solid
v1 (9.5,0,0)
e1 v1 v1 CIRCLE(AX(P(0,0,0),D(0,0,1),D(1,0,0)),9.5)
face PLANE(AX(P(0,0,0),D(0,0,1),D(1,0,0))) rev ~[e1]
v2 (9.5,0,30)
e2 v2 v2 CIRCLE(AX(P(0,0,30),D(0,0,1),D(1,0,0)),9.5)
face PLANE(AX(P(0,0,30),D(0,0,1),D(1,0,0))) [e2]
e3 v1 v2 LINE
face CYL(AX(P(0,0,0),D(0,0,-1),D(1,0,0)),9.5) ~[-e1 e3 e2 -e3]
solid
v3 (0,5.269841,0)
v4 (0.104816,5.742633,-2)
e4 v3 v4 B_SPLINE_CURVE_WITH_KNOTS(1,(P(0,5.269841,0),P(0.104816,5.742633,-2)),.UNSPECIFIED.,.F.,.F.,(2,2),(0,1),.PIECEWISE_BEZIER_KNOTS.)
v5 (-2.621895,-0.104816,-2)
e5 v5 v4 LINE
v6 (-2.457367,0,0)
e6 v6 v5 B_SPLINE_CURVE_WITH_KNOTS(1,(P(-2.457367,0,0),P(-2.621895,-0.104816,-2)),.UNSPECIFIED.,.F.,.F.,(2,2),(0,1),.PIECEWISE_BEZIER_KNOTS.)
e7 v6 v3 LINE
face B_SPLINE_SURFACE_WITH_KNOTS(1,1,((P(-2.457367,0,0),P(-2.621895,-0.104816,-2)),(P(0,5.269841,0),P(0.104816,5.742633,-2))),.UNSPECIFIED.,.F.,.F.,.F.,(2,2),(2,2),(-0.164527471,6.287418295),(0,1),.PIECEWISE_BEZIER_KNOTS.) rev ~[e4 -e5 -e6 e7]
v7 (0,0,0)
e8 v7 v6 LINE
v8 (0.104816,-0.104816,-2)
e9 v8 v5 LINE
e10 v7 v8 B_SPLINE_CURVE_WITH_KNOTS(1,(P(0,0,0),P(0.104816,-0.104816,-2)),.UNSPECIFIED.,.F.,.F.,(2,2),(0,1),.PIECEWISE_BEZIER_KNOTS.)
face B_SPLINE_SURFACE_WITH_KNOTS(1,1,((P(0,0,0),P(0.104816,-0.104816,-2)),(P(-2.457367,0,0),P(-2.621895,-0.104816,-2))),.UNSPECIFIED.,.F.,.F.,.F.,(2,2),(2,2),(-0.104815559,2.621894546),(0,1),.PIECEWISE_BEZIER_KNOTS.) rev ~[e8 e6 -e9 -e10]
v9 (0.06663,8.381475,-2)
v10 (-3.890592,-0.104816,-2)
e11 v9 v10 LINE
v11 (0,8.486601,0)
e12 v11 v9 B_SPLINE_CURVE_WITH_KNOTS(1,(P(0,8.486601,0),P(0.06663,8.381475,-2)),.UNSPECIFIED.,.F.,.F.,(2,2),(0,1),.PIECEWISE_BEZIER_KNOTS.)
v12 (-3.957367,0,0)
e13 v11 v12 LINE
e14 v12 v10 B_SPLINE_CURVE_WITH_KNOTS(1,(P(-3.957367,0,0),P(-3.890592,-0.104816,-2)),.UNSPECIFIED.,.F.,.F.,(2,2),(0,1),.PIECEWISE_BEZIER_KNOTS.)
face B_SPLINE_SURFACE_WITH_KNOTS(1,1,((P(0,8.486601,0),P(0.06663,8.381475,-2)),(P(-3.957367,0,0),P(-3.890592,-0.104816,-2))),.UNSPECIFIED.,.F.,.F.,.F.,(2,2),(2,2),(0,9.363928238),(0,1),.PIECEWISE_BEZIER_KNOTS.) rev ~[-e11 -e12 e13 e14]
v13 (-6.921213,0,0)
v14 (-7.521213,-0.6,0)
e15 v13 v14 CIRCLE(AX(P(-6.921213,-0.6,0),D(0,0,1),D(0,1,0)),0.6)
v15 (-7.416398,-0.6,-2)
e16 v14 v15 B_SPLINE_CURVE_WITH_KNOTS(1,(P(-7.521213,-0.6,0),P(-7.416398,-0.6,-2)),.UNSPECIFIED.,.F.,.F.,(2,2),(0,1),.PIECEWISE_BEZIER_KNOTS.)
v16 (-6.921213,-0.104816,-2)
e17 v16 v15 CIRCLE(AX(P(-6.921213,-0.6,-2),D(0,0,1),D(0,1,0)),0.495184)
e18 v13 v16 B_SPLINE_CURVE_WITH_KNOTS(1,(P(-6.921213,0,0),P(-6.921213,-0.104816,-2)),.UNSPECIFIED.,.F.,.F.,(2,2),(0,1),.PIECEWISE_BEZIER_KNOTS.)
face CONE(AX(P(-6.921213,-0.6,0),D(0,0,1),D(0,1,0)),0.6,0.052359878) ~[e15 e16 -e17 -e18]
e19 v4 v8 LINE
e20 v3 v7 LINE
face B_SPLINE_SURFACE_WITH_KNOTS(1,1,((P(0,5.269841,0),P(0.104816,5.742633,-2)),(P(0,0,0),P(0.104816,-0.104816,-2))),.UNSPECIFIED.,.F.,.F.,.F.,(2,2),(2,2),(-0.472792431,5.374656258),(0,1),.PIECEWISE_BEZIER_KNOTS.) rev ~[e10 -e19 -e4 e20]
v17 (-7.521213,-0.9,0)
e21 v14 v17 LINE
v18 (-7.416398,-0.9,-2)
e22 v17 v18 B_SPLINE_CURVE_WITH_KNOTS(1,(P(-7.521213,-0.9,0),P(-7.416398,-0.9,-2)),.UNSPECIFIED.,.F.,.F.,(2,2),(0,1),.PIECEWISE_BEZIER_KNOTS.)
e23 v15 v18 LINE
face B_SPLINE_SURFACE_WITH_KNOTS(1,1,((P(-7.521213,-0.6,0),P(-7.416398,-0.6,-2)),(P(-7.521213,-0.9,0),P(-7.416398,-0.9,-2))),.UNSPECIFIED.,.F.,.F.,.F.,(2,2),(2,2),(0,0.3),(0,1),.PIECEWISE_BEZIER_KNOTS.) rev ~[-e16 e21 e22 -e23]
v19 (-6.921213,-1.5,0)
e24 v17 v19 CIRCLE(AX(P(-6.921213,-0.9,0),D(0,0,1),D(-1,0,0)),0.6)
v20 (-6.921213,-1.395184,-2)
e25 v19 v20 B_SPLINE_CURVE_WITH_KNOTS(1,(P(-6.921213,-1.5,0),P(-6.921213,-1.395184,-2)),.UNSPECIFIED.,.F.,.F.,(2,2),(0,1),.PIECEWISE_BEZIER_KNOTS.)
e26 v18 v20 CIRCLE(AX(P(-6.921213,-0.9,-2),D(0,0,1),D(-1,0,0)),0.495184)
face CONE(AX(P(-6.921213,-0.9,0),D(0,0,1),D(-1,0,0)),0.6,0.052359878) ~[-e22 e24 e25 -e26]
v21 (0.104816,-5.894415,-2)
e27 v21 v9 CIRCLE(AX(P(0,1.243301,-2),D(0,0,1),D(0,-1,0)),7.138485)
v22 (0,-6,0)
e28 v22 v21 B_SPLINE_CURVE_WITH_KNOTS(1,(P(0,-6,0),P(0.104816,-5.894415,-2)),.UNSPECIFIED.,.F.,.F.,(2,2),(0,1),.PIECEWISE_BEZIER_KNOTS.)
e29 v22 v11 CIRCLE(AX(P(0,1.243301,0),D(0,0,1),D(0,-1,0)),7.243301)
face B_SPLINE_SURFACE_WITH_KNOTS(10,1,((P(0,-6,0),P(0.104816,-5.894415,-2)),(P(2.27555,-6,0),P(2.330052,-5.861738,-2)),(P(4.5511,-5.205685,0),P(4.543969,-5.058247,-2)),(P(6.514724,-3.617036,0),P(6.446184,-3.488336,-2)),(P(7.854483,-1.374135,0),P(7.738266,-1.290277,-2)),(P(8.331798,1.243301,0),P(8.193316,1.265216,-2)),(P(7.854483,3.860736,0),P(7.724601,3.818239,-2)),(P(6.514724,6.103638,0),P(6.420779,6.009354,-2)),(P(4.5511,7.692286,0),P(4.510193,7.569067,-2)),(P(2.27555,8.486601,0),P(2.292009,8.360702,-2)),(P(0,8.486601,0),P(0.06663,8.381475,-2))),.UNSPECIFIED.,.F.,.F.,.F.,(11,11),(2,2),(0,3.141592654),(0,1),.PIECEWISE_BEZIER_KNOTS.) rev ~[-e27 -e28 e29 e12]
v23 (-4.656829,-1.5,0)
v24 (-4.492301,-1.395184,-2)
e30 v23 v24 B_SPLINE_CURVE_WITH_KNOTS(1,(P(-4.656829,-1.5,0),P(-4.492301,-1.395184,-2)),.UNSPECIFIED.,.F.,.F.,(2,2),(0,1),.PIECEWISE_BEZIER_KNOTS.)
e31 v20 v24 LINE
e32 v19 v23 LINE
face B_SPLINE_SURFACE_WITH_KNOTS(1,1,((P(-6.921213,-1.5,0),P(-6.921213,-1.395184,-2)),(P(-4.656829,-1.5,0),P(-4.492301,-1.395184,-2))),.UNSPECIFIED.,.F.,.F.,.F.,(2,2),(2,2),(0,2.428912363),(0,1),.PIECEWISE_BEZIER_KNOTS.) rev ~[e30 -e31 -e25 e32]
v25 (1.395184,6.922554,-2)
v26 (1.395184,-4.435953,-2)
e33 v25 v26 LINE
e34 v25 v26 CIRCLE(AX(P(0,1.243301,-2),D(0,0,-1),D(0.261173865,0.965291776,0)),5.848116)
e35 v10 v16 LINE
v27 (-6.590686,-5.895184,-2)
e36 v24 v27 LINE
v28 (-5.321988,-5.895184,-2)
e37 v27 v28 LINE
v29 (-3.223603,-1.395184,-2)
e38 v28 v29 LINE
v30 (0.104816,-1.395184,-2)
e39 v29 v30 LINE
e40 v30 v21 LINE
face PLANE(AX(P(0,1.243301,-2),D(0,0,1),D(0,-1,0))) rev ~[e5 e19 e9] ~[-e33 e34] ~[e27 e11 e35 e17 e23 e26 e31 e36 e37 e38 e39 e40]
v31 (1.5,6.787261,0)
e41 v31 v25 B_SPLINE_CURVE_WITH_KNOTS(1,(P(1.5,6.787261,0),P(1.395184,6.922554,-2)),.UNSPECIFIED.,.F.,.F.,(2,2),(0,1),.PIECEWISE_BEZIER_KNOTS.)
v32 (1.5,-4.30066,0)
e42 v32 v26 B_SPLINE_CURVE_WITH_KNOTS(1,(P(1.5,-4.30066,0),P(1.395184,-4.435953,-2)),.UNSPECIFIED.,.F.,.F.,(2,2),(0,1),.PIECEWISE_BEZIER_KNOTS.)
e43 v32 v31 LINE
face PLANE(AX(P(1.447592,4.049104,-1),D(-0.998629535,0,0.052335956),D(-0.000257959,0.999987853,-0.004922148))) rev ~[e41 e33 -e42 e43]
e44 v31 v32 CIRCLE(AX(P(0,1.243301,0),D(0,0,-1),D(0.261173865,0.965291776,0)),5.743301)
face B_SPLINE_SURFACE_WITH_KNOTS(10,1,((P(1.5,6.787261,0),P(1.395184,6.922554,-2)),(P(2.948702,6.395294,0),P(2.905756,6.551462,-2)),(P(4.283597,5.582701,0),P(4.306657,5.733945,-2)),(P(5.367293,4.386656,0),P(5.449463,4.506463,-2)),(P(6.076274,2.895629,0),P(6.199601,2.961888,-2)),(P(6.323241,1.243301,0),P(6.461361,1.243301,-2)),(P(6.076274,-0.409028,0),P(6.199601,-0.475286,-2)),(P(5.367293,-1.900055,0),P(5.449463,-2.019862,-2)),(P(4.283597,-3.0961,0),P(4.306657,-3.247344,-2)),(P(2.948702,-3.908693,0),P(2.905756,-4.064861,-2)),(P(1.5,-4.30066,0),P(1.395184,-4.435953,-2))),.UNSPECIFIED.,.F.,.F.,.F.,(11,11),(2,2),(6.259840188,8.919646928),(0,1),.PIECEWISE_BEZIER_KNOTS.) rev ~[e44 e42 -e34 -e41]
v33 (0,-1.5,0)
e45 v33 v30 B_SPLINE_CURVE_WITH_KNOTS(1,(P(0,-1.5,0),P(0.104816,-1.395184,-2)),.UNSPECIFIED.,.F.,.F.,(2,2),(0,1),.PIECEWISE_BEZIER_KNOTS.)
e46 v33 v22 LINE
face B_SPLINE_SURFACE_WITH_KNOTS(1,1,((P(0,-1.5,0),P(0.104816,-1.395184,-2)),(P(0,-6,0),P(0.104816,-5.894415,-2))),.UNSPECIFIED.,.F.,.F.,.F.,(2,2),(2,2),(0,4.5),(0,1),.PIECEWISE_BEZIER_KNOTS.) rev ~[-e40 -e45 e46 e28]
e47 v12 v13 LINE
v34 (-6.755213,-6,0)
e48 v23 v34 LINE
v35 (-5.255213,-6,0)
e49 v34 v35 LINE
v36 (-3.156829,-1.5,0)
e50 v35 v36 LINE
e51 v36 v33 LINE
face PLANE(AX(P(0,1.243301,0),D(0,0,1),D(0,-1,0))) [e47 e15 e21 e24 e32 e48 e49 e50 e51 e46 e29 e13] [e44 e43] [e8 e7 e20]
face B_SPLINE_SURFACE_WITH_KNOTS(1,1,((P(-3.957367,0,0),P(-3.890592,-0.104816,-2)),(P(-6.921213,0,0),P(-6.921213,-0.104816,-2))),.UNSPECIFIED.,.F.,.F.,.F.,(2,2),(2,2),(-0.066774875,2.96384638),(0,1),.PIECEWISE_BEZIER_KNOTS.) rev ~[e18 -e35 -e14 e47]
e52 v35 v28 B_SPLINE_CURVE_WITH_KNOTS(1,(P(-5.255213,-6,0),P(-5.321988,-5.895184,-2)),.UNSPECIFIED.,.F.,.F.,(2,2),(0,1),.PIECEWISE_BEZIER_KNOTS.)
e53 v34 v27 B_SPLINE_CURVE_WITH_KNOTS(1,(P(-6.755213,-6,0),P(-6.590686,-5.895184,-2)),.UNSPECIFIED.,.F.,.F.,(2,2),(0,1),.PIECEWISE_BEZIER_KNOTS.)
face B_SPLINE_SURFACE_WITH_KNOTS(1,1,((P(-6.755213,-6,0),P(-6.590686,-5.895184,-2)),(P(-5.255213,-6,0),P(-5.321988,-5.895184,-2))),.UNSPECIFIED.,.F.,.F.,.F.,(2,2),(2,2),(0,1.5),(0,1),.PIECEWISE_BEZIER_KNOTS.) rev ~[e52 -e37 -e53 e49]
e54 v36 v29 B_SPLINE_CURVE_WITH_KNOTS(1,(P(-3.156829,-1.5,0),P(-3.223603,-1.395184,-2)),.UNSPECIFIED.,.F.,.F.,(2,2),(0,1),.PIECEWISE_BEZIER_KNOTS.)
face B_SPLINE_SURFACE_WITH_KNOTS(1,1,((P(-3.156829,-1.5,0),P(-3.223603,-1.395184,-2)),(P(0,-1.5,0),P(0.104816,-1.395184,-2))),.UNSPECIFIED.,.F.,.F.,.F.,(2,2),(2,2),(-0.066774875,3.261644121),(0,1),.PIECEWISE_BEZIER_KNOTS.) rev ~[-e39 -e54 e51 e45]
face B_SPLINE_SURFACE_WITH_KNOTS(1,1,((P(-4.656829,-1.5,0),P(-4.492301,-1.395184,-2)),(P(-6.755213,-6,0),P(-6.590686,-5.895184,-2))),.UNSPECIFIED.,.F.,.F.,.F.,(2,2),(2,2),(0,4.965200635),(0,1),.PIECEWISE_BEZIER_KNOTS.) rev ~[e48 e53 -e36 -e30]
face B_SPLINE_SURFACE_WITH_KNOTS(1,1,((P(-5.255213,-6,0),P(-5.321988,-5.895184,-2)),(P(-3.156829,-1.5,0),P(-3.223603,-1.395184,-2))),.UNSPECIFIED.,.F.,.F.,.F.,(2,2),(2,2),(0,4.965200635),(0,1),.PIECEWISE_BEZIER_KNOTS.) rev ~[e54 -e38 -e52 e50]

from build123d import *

# Parameters (mm, degrees)
F1_DEPTH = 2
F1_TAPER = 3
F0_R     = 9.5
F2_DEPTH = 30


with BuildPart() as f1:
    # F0 (on Top) → F1 (new body)
    with BuildSketch(Plane.XY):
        with BuildLine():
            ThreePointArc((0, -6), (7.2433005399, 1.2433005399), (0, 8.4866010798))
            Line((0, 8.4866010798), (-3.9573670752, 0))
            Line((-3.9573670752, 0), (-6.9212134549, 0))
            ThreePointArc((-6.9212134549, 0), (-7.3454775236, -0.1757359313), (-7.5212134549, -0.6))
            Line((-7.5212134549, -0.6), (-7.5212134549, -0.9))
            ThreePointArc((-7.5212134549, -0.9), (-7.3454775236, -1.3242640687), (-6.9212134549, -1.5))
            Line((-6.9212134549, -1.5), (-4.6568285624, -1.5))
            Line((-4.6568285624, -1.5), (-6.7552130241, -6))
            Line((-6.7552130241, -6), (-5.2552130241, -6))
            Line((-5.2552130241, -6), (-3.1568285624, -1.5))
            Line((-3.1568285624, -1.5), (0, -1.5))
            Line((0, -1.5), (0, -6))
        make_face()
        Polygon((0, 0), (-2.4573670752, 0), (0, 5.269840699), align=None, mode=Mode.SUBTRACT)
        with BuildLine():
            Line((1.5, -4.3006602366), (1.5, 6.7872613164))
            ThreePointArc((1.5, 6.7872613164), (5.7433005399, 1.2433005399), (1.5, -4.3006602366))
        make_face(mode=Mode.SUBTRACT)
    extrude(amount=-F1_DEPTH, taper=F1_TAPER)


with BuildPart() as f2:
    # F0 (on Top) → F2 (new body)
    with BuildSketch(Plane.XY):
        Circle(F0_R)
        with BuildLine():
            Line((-3.9573670752, 0), (0, 8.4866010798))
            ThreePointArc((0, 8.4866010798), (7.2433005399, 1.2433005399), (0, -6))
            Line((0, -6), (0, -1.5))
            Line((0, -1.5), (-3.1568285624, -1.5))
            Line((-3.1568285624, -1.5), (-5.2552130241, -6))
            Line((-5.2552130241, -6), (-6.7552130241, -6))
            Line((-6.7552130241, -6), (-4.6568285624, -1.5))
            Line((-4.6568285624, -1.5), (-6.9212134549, -1.5))
            ThreePointArc((-6.9212134549, -1.5), (-7.3454775236, -1.3242640687), (-7.5212134549, -0.9))
            Line((-7.5212134549, -0.9), (-7.5212134549, -0.6))
            ThreePointArc((-7.5212134549, -0.6), (-7.3454775236, -0.1757359313), (-6.9212134549, 0))
            Line((-6.9212134549, 0), (-3.9573670752, 0))
        make_face(mode=Mode.SUBTRACT)
        with BuildLine():
            ThreePointArc((0, -6), (7.2433005399, 1.2433005399), (0, 8.4866010798))
            Line((0, 8.4866010798), (-3.9573670752, 0))
            Line((-3.9573670752, 0), (-6.9212134549, 0))
            ThreePointArc((-6.9212134549, 0), (-7.3454775236, -0.1757359313), (-7.5212134549, -0.6))
            Line((-7.5212134549, -0.6), (-7.5212134549, -0.9))
            ThreePointArc((-7.5212134549, -0.9), (-7.3454775236, -1.3242640687), (-6.9212134549, -1.5))
            Line((-6.9212134549, -1.5), (-4.6568285624, -1.5))
            Line((-4.6568285624, -1.5), (-6.7552130241, -6))
            Line((-6.7552130241, -6), (-5.2552130241, -6))
            Line((-5.2552130241, -6), (-3.1568285624, -1.5))
            Line((-3.1568285624, -1.5), (0, -1.5))
            Line((0, -1.5), (0, -6))
        make_face()
        Polygon((0, 0), (-2.4573670752, 0), (0, 5.269840699), align=None, mode=Mode.SUBTRACT)
        with BuildLine():
            Line((1.5, -4.3006602366), (1.5, 6.7872613164))
            ThreePointArc((1.5, 6.7872613164), (5.7433005399, 1.2433005399), (1.5, -4.3006602366))
        make_face(mode=Mode.SUBTRACT)
        Polygon((0, 5.269840699), (-2.4573670752, 0), (0, 0), align=None)
        with BuildLine():
            ThreePointArc((1.5, -4.3006602366), (5.7433005399, 1.2433005399), (1.5, 6.7872613164))
            Line((1.5, 6.7872613164), (1.5, -4.3006602366))
        make_face()
    extrude(amount=F2_DEPTH)


solid = Compound([f1.part, f2.part])
